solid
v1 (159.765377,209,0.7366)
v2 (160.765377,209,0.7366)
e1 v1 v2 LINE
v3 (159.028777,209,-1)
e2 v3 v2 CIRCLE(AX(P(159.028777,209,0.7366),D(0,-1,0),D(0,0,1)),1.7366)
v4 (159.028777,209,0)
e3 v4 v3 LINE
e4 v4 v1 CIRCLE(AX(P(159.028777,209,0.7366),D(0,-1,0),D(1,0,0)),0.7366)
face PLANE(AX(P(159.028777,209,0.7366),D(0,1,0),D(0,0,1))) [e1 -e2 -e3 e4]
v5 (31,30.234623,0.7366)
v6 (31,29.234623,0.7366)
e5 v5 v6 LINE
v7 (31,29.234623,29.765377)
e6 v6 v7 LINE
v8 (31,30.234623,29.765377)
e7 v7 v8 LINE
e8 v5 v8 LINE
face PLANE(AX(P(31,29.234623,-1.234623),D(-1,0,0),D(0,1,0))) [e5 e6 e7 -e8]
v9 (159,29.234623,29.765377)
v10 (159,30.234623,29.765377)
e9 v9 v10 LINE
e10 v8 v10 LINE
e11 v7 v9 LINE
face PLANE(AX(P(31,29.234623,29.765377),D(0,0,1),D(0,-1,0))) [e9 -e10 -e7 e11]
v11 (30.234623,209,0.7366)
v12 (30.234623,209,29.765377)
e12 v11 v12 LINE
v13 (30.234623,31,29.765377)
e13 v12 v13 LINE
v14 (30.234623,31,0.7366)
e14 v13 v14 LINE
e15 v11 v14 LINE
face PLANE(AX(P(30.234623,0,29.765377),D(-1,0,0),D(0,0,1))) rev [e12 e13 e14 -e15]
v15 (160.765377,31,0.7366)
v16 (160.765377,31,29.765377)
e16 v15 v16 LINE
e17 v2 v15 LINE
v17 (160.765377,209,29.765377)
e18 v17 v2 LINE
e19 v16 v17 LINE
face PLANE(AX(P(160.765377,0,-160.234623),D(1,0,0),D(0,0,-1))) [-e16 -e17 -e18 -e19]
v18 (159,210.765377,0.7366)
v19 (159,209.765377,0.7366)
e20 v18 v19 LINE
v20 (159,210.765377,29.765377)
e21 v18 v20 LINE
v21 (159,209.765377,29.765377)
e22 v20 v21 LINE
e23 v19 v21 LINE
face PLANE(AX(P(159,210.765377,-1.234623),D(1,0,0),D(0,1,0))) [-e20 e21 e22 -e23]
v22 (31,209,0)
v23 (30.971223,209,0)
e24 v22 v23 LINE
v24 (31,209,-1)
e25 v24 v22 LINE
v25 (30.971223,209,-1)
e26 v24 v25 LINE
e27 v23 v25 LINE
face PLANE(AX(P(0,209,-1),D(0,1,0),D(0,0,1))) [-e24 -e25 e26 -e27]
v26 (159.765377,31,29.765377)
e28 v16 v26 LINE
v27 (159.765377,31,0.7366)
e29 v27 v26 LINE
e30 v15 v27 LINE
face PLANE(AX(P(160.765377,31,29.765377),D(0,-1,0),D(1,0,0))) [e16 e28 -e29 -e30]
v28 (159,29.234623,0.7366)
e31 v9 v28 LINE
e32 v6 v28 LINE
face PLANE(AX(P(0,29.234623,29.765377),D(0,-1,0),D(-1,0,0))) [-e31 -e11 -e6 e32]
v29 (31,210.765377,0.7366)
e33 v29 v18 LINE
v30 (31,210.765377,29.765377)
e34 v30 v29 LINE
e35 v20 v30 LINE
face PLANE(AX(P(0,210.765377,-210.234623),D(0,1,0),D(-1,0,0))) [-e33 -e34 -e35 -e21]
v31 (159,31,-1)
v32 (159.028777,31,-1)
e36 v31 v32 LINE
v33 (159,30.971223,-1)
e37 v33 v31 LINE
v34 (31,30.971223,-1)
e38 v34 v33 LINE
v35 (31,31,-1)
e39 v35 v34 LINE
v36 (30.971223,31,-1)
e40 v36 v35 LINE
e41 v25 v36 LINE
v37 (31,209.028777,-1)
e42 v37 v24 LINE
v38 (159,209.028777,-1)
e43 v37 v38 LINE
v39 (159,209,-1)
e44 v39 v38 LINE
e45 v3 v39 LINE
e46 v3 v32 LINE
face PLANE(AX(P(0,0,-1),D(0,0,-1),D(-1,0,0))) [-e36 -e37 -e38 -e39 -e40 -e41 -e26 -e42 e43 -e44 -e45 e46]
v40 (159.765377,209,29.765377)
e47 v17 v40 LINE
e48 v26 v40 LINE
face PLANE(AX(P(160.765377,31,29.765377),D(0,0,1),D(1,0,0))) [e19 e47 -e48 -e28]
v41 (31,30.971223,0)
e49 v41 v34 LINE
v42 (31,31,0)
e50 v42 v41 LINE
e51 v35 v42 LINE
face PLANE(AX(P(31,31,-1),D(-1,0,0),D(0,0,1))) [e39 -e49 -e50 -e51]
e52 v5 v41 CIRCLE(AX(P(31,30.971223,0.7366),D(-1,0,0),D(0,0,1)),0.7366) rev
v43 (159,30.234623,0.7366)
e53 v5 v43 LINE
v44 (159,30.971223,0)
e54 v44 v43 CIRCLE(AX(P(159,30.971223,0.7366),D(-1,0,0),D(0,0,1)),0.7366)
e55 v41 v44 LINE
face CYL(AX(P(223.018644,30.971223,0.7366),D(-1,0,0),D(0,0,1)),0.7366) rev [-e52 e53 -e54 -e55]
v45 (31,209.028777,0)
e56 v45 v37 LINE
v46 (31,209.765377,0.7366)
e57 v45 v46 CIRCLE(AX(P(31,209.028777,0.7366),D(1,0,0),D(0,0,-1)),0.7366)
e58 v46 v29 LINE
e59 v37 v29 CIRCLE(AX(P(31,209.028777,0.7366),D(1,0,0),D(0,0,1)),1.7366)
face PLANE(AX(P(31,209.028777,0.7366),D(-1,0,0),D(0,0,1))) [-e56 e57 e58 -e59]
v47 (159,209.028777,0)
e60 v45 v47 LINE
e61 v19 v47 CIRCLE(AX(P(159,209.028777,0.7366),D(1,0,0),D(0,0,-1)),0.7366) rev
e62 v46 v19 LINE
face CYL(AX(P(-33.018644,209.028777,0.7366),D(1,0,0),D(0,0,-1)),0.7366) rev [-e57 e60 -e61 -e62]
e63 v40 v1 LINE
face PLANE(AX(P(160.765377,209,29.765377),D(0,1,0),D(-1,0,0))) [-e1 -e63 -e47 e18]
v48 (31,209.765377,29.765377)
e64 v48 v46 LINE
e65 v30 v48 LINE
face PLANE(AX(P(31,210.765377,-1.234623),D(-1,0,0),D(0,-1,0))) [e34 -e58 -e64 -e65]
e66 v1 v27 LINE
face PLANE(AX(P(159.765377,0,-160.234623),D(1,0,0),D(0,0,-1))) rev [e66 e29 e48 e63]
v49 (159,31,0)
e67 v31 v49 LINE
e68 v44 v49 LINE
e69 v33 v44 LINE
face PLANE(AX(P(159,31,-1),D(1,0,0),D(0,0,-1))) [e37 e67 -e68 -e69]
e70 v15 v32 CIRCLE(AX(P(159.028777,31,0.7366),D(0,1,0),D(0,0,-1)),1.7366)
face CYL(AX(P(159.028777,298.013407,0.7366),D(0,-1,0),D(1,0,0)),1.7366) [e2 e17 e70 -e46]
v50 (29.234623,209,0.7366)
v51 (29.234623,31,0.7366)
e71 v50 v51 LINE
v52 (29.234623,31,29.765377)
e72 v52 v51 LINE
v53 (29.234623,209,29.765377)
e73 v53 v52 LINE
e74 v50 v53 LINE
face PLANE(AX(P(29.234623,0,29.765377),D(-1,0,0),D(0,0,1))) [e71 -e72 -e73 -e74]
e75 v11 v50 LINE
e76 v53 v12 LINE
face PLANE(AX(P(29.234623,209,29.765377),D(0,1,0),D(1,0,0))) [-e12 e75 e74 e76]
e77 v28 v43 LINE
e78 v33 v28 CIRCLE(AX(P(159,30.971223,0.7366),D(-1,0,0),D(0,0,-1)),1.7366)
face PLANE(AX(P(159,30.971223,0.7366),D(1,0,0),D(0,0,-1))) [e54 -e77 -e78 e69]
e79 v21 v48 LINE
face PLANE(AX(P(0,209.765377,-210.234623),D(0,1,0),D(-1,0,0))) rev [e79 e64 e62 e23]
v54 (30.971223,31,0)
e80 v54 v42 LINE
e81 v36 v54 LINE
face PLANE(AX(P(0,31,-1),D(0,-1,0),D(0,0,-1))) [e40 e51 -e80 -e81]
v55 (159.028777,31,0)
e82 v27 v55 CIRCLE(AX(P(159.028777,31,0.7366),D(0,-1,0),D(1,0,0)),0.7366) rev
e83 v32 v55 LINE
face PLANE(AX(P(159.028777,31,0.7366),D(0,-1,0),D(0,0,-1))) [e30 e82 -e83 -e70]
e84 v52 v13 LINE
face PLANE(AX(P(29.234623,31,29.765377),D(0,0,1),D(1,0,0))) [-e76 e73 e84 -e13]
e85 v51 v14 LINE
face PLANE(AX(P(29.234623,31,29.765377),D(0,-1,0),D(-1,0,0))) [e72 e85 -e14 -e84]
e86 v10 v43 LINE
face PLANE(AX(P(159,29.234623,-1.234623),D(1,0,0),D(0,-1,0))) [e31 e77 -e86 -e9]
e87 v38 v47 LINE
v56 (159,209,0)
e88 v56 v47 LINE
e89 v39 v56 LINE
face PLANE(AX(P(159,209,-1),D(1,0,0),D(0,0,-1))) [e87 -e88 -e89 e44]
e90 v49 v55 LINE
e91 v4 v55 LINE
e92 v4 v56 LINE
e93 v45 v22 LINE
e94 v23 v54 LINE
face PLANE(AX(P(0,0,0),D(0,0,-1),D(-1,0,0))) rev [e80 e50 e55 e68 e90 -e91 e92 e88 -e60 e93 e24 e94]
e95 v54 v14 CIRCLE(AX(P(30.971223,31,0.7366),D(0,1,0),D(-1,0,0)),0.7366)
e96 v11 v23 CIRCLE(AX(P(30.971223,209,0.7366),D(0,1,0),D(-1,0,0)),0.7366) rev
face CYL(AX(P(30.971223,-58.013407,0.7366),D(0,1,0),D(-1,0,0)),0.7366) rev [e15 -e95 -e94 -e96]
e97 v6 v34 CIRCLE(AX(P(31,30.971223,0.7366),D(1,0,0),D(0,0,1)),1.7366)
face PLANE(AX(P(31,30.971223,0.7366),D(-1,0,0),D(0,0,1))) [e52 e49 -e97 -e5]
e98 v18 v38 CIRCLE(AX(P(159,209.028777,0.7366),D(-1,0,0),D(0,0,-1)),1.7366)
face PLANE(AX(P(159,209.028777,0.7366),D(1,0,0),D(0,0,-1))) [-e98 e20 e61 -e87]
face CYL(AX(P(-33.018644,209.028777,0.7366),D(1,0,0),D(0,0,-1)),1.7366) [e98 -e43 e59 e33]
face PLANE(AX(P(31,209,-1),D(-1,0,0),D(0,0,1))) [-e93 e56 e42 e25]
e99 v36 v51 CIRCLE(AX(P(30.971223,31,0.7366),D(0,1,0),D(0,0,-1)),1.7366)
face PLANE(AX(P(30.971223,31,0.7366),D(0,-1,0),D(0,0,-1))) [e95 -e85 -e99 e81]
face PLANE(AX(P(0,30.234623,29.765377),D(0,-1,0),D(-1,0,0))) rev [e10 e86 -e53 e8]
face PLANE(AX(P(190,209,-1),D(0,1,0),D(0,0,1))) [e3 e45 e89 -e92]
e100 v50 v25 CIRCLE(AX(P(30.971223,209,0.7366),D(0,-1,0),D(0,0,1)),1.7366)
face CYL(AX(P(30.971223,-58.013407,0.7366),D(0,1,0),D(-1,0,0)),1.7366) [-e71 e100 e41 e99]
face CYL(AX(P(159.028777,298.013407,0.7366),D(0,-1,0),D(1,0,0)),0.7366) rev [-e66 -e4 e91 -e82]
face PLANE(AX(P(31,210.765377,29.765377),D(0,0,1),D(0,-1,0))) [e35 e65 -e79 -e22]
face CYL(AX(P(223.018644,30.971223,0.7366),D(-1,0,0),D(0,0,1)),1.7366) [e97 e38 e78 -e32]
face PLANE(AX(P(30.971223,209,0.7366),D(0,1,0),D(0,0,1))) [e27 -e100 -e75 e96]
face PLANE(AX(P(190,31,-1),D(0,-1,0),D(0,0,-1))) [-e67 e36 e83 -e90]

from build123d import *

# Parameters (mm, degrees)
BASE_FLANGE1_DEPTH         = 1
SKETCHED_START             = 31
SKETCHED_BEND1_DEPTH       = 178
SKETCHED_BEND1_2_DEPTH     = 128
SKETCHED_BEND1_3_DEPTH     = 178
SKETCHED_BEND1_4_OUTLINE_W = 128
SKETCHED_BEND1_4_OUTLINE_H = 1
SKETCHED_BEND1_4_DEPTH     = 29.234623369
SKETCHED_START_2           = 210.765376631
SKETCHED_BEND1_5_OUTLINE_W = 128
SKETCHED_BEND1_5_OUTLINE_H = 1
SKETCHED_BEND1_5_DEPTH     = 29.234623369
SKETCHED_BEND1_6_DEPTH     = 128
SKETCHED_BEND1_7_OUTLINE_W = 178
SKETCHED_BEND1_7_OUTLINE_H = 1
SKETCHED_BEND1_7_DEPTH     = 29.234623369
SKETCHED_START_3           = 160.765376631
SKETCHED_BEND1_8_OUTLINE_W = 178
SKETCHED_BEND1_8_OUTLINE_H = 1
SKETCHED_BEND1_8_DEPTH     = 29.234623369


# Read off the part's stored shape, not the designer's step: Sketched Bend1
# Sheet-metal steps are written as plain solids
with BuildPart() as part:
    # Sketch1 → Base-Flange1 (new body)
    with BuildSketch(Plane.XY):
        Polygon((0, 209), (31, 209), (31, 240), (159, 240), (159, 209), (190, 209), (190, 31), (159, 31), (159, 0), (31, 0), (31, 31), (0, 31), align=None)
    extrude(amount=-BASE_FLANGE1_DEPTH)

    # Sketched Bend1 outline → Sketched Bend1 (add)
    with BuildSketch(Plane(origin=(0, 0, 0), x_dir=(1, 0, 0), z_dir=(0, 1, 0)).offset(SKETCHED_START)):
        with BuildLine():
            Line((29.234623369, -0.7366), (29.234623369, -29.765376631))
            Line((29.234623369, -29.765376631), (30.234623369, -29.765376631))
            Line((30.234623369, -29.765376631), (30.234623369, -0.7366))
            ThreePointArc((30.234623369, -0.7366), (30.450368514, -0.215745145), (30.971223369, 0))
            Line((30.971223369, 0), (29.398582279, 0))
            ThreePointArc((29.398582279, 0), (29.276108612, -0.359286442), (29.234623369, -0.7366))
        make_face()
        with BuildLine():
            Line((160.601417721, 0), (159.028776631, 0))
            ThreePointArc((159.028776631, 0), (159.549631486, -0.215745145), (159.765376631, -0.7366))
            Line((159.765376631, -0.7366), (159.765376631, -29.765376631))
            Line((159.765376631, -29.765376631), (160.765376631, -29.765376631))
            Line((160.765376631, -29.765376631), (160.765376631, -0.7366))
            ThreePointArc((160.765376631, -0.7366), (160.723891388, -0.359286442), (160.601417721, 0))
        make_face()
    extrude(amount=SKETCHED_BEND1_DEPTH)

    # Sketched Bend1 2 outline → Sketched Bend1 2 (add)
    with BuildSketch(Plane.YZ.offset(SKETCHED_START)):
        with BuildLine():
            Line((209.028776631, 0), (210.601417721, 0))
            ThreePointArc((210.601417721, 0), (210.723891388, 0.359286442), (210.765376631, 0.7366))
            Line((210.765376631, 0.7366), (210.765376631, 29.765376631))
            Line((210.765376631, 29.765376631), (209.765376631, 29.765376631))
            Line((209.765376631, 29.765376631), (209.765376631, 0.7366))
            ThreePointArc((209.765376631, 0.7366), (209.549631486, 0.215745145), (209.028776631, 0))
        make_face()
        with BuildLine():
            ThreePointArc((29.234623369, 0.7366), (29.276108612, 0.359286442), (29.398582279, 0))
            Line((29.398582279, 0), (30.971223369, 0))
            ThreePointArc((30.971223369, 0), (30.450368514, 0.215745145), (30.234623369, 0.7366))
            Line((30.234623369, 0.7366), (30.234623369, 29.765376631))
            Line((30.234623369, 29.765376631), (29.234623369, 29.765376631))
            Line((29.234623369, 29.765376631), (29.234623369, 0.7366))
        make_face()
    extrude(amount=SKETCHED_BEND1_2_DEPTH)

    # Sketched Bend1 3 outline → Sketched Bend1 3 (cut)
    with BuildSketch(Plane(origin=(0, 0, 0), x_dir=(1, 0, 0), z_dir=(0, 1, 0)).offset(SKETCHED_START)):
        with BuildLine():
            Line((0, 0), (29.398582279, 0))
            ThreePointArc((29.398582279, 0), (30.039397205, 0.728828115), (30.971223369, 1))
            Line((30.971223369, 1), (0, 1))
            Line((0, 1), (0, 0))
        make_face()
        with BuildLine():
            Line((190, 1), (159.028776631, 1))
            ThreePointArc((159.028776631, 1), (159.960602795, 0.728828115), (160.601417721, 0))
            Line((160.601417721, 0), (190, 0))
            Line((190, 0), (190, 1))
        make_face()
    extrude(amount=SKETCHED_BEND1_3_DEPTH, mode=Mode.SUBTRACT)

    # Sketched Bend1 4 outline → Sketched Bend1 4 (cut)
    with BuildSketch(Plane(origin=(0, 0, 0), x_dir=(1, 0, 0), z_dir=(0, 1, 0))):
        with Locations((95, 0.5)):
            Rectangle(SKETCHED_BEND1_4_OUTLINE_W, SKETCHED_BEND1_4_OUTLINE_H)
    extrude(amount=SKETCHED_BEND1_4_DEPTH, mode=Mode.SUBTRACT)

    # Sketched Bend1 5 outline → Sketched Bend1 5 (cut)
    with BuildSketch(Plane(origin=(0, 0, 0), x_dir=(1, 0, 0), z_dir=(0, 1, 0)).offset(SKETCHED_START_2)):
        with Locations((95, 0.5)):
            Rectangle(SKETCHED_BEND1_5_OUTLINE_W, SKETCHED_BEND1_5_OUTLINE_H)
    extrude(amount=SKETCHED_BEND1_5_DEPTH, mode=Mode.SUBTRACT)

    # Sketched Bend1 6 outline → Sketched Bend1 6 (cut)
    with BuildSketch(Plane.YZ.offset(SKETCHED_START)):
        with BuildLine():
            ThreePointArc((210.601417721, 0), (209.960602795, -0.728828115), (209.028776631, -1))
            Line((209.028776631, -1), (240, -1))
            Line((240, -1), (240, 0))
            Line((240, 0), (210.601417721, 0))
        make_face()
        with BuildLine():
            Line((0, -1), (30.971223369, -1))
            ThreePointArc((30.971223369, -1), (30.039397205, -0.728828115), (29.398582279, 0))
            Line((29.398582279, 0), (0, 0))
            Line((0, 0), (0, -1))
        make_face()
    extrude(amount=SKETCHED_BEND1_6_DEPTH, mode=Mode.SUBTRACT)

    # Sketched Bend1 7 outline → Sketched Bend1 7 (cut)
    with BuildSketch(Plane.YZ):
        with Locations((120, -0.5)):
            Rectangle(SKETCHED_BEND1_7_OUTLINE_W, SKETCHED_BEND1_7_OUTLINE_H)
    extrude(amount=SKETCHED_BEND1_7_DEPTH, mode=Mode.SUBTRACT)

    # Sketched Bend1 8 outline → Sketched Bend1 8 (cut)
    with BuildSketch(Plane.YZ.offset(SKETCHED_START_3)):
        with Locations((120, -0.5)):
            Rectangle(SKETCHED_BEND1_8_OUTLINE_W, SKETCHED_BEND1_8_OUTLINE_H)
    extrude(amount=SKETCHED_BEND1_8_DEPTH, mode=Mode.SUBTRACT)


solid = part.part
